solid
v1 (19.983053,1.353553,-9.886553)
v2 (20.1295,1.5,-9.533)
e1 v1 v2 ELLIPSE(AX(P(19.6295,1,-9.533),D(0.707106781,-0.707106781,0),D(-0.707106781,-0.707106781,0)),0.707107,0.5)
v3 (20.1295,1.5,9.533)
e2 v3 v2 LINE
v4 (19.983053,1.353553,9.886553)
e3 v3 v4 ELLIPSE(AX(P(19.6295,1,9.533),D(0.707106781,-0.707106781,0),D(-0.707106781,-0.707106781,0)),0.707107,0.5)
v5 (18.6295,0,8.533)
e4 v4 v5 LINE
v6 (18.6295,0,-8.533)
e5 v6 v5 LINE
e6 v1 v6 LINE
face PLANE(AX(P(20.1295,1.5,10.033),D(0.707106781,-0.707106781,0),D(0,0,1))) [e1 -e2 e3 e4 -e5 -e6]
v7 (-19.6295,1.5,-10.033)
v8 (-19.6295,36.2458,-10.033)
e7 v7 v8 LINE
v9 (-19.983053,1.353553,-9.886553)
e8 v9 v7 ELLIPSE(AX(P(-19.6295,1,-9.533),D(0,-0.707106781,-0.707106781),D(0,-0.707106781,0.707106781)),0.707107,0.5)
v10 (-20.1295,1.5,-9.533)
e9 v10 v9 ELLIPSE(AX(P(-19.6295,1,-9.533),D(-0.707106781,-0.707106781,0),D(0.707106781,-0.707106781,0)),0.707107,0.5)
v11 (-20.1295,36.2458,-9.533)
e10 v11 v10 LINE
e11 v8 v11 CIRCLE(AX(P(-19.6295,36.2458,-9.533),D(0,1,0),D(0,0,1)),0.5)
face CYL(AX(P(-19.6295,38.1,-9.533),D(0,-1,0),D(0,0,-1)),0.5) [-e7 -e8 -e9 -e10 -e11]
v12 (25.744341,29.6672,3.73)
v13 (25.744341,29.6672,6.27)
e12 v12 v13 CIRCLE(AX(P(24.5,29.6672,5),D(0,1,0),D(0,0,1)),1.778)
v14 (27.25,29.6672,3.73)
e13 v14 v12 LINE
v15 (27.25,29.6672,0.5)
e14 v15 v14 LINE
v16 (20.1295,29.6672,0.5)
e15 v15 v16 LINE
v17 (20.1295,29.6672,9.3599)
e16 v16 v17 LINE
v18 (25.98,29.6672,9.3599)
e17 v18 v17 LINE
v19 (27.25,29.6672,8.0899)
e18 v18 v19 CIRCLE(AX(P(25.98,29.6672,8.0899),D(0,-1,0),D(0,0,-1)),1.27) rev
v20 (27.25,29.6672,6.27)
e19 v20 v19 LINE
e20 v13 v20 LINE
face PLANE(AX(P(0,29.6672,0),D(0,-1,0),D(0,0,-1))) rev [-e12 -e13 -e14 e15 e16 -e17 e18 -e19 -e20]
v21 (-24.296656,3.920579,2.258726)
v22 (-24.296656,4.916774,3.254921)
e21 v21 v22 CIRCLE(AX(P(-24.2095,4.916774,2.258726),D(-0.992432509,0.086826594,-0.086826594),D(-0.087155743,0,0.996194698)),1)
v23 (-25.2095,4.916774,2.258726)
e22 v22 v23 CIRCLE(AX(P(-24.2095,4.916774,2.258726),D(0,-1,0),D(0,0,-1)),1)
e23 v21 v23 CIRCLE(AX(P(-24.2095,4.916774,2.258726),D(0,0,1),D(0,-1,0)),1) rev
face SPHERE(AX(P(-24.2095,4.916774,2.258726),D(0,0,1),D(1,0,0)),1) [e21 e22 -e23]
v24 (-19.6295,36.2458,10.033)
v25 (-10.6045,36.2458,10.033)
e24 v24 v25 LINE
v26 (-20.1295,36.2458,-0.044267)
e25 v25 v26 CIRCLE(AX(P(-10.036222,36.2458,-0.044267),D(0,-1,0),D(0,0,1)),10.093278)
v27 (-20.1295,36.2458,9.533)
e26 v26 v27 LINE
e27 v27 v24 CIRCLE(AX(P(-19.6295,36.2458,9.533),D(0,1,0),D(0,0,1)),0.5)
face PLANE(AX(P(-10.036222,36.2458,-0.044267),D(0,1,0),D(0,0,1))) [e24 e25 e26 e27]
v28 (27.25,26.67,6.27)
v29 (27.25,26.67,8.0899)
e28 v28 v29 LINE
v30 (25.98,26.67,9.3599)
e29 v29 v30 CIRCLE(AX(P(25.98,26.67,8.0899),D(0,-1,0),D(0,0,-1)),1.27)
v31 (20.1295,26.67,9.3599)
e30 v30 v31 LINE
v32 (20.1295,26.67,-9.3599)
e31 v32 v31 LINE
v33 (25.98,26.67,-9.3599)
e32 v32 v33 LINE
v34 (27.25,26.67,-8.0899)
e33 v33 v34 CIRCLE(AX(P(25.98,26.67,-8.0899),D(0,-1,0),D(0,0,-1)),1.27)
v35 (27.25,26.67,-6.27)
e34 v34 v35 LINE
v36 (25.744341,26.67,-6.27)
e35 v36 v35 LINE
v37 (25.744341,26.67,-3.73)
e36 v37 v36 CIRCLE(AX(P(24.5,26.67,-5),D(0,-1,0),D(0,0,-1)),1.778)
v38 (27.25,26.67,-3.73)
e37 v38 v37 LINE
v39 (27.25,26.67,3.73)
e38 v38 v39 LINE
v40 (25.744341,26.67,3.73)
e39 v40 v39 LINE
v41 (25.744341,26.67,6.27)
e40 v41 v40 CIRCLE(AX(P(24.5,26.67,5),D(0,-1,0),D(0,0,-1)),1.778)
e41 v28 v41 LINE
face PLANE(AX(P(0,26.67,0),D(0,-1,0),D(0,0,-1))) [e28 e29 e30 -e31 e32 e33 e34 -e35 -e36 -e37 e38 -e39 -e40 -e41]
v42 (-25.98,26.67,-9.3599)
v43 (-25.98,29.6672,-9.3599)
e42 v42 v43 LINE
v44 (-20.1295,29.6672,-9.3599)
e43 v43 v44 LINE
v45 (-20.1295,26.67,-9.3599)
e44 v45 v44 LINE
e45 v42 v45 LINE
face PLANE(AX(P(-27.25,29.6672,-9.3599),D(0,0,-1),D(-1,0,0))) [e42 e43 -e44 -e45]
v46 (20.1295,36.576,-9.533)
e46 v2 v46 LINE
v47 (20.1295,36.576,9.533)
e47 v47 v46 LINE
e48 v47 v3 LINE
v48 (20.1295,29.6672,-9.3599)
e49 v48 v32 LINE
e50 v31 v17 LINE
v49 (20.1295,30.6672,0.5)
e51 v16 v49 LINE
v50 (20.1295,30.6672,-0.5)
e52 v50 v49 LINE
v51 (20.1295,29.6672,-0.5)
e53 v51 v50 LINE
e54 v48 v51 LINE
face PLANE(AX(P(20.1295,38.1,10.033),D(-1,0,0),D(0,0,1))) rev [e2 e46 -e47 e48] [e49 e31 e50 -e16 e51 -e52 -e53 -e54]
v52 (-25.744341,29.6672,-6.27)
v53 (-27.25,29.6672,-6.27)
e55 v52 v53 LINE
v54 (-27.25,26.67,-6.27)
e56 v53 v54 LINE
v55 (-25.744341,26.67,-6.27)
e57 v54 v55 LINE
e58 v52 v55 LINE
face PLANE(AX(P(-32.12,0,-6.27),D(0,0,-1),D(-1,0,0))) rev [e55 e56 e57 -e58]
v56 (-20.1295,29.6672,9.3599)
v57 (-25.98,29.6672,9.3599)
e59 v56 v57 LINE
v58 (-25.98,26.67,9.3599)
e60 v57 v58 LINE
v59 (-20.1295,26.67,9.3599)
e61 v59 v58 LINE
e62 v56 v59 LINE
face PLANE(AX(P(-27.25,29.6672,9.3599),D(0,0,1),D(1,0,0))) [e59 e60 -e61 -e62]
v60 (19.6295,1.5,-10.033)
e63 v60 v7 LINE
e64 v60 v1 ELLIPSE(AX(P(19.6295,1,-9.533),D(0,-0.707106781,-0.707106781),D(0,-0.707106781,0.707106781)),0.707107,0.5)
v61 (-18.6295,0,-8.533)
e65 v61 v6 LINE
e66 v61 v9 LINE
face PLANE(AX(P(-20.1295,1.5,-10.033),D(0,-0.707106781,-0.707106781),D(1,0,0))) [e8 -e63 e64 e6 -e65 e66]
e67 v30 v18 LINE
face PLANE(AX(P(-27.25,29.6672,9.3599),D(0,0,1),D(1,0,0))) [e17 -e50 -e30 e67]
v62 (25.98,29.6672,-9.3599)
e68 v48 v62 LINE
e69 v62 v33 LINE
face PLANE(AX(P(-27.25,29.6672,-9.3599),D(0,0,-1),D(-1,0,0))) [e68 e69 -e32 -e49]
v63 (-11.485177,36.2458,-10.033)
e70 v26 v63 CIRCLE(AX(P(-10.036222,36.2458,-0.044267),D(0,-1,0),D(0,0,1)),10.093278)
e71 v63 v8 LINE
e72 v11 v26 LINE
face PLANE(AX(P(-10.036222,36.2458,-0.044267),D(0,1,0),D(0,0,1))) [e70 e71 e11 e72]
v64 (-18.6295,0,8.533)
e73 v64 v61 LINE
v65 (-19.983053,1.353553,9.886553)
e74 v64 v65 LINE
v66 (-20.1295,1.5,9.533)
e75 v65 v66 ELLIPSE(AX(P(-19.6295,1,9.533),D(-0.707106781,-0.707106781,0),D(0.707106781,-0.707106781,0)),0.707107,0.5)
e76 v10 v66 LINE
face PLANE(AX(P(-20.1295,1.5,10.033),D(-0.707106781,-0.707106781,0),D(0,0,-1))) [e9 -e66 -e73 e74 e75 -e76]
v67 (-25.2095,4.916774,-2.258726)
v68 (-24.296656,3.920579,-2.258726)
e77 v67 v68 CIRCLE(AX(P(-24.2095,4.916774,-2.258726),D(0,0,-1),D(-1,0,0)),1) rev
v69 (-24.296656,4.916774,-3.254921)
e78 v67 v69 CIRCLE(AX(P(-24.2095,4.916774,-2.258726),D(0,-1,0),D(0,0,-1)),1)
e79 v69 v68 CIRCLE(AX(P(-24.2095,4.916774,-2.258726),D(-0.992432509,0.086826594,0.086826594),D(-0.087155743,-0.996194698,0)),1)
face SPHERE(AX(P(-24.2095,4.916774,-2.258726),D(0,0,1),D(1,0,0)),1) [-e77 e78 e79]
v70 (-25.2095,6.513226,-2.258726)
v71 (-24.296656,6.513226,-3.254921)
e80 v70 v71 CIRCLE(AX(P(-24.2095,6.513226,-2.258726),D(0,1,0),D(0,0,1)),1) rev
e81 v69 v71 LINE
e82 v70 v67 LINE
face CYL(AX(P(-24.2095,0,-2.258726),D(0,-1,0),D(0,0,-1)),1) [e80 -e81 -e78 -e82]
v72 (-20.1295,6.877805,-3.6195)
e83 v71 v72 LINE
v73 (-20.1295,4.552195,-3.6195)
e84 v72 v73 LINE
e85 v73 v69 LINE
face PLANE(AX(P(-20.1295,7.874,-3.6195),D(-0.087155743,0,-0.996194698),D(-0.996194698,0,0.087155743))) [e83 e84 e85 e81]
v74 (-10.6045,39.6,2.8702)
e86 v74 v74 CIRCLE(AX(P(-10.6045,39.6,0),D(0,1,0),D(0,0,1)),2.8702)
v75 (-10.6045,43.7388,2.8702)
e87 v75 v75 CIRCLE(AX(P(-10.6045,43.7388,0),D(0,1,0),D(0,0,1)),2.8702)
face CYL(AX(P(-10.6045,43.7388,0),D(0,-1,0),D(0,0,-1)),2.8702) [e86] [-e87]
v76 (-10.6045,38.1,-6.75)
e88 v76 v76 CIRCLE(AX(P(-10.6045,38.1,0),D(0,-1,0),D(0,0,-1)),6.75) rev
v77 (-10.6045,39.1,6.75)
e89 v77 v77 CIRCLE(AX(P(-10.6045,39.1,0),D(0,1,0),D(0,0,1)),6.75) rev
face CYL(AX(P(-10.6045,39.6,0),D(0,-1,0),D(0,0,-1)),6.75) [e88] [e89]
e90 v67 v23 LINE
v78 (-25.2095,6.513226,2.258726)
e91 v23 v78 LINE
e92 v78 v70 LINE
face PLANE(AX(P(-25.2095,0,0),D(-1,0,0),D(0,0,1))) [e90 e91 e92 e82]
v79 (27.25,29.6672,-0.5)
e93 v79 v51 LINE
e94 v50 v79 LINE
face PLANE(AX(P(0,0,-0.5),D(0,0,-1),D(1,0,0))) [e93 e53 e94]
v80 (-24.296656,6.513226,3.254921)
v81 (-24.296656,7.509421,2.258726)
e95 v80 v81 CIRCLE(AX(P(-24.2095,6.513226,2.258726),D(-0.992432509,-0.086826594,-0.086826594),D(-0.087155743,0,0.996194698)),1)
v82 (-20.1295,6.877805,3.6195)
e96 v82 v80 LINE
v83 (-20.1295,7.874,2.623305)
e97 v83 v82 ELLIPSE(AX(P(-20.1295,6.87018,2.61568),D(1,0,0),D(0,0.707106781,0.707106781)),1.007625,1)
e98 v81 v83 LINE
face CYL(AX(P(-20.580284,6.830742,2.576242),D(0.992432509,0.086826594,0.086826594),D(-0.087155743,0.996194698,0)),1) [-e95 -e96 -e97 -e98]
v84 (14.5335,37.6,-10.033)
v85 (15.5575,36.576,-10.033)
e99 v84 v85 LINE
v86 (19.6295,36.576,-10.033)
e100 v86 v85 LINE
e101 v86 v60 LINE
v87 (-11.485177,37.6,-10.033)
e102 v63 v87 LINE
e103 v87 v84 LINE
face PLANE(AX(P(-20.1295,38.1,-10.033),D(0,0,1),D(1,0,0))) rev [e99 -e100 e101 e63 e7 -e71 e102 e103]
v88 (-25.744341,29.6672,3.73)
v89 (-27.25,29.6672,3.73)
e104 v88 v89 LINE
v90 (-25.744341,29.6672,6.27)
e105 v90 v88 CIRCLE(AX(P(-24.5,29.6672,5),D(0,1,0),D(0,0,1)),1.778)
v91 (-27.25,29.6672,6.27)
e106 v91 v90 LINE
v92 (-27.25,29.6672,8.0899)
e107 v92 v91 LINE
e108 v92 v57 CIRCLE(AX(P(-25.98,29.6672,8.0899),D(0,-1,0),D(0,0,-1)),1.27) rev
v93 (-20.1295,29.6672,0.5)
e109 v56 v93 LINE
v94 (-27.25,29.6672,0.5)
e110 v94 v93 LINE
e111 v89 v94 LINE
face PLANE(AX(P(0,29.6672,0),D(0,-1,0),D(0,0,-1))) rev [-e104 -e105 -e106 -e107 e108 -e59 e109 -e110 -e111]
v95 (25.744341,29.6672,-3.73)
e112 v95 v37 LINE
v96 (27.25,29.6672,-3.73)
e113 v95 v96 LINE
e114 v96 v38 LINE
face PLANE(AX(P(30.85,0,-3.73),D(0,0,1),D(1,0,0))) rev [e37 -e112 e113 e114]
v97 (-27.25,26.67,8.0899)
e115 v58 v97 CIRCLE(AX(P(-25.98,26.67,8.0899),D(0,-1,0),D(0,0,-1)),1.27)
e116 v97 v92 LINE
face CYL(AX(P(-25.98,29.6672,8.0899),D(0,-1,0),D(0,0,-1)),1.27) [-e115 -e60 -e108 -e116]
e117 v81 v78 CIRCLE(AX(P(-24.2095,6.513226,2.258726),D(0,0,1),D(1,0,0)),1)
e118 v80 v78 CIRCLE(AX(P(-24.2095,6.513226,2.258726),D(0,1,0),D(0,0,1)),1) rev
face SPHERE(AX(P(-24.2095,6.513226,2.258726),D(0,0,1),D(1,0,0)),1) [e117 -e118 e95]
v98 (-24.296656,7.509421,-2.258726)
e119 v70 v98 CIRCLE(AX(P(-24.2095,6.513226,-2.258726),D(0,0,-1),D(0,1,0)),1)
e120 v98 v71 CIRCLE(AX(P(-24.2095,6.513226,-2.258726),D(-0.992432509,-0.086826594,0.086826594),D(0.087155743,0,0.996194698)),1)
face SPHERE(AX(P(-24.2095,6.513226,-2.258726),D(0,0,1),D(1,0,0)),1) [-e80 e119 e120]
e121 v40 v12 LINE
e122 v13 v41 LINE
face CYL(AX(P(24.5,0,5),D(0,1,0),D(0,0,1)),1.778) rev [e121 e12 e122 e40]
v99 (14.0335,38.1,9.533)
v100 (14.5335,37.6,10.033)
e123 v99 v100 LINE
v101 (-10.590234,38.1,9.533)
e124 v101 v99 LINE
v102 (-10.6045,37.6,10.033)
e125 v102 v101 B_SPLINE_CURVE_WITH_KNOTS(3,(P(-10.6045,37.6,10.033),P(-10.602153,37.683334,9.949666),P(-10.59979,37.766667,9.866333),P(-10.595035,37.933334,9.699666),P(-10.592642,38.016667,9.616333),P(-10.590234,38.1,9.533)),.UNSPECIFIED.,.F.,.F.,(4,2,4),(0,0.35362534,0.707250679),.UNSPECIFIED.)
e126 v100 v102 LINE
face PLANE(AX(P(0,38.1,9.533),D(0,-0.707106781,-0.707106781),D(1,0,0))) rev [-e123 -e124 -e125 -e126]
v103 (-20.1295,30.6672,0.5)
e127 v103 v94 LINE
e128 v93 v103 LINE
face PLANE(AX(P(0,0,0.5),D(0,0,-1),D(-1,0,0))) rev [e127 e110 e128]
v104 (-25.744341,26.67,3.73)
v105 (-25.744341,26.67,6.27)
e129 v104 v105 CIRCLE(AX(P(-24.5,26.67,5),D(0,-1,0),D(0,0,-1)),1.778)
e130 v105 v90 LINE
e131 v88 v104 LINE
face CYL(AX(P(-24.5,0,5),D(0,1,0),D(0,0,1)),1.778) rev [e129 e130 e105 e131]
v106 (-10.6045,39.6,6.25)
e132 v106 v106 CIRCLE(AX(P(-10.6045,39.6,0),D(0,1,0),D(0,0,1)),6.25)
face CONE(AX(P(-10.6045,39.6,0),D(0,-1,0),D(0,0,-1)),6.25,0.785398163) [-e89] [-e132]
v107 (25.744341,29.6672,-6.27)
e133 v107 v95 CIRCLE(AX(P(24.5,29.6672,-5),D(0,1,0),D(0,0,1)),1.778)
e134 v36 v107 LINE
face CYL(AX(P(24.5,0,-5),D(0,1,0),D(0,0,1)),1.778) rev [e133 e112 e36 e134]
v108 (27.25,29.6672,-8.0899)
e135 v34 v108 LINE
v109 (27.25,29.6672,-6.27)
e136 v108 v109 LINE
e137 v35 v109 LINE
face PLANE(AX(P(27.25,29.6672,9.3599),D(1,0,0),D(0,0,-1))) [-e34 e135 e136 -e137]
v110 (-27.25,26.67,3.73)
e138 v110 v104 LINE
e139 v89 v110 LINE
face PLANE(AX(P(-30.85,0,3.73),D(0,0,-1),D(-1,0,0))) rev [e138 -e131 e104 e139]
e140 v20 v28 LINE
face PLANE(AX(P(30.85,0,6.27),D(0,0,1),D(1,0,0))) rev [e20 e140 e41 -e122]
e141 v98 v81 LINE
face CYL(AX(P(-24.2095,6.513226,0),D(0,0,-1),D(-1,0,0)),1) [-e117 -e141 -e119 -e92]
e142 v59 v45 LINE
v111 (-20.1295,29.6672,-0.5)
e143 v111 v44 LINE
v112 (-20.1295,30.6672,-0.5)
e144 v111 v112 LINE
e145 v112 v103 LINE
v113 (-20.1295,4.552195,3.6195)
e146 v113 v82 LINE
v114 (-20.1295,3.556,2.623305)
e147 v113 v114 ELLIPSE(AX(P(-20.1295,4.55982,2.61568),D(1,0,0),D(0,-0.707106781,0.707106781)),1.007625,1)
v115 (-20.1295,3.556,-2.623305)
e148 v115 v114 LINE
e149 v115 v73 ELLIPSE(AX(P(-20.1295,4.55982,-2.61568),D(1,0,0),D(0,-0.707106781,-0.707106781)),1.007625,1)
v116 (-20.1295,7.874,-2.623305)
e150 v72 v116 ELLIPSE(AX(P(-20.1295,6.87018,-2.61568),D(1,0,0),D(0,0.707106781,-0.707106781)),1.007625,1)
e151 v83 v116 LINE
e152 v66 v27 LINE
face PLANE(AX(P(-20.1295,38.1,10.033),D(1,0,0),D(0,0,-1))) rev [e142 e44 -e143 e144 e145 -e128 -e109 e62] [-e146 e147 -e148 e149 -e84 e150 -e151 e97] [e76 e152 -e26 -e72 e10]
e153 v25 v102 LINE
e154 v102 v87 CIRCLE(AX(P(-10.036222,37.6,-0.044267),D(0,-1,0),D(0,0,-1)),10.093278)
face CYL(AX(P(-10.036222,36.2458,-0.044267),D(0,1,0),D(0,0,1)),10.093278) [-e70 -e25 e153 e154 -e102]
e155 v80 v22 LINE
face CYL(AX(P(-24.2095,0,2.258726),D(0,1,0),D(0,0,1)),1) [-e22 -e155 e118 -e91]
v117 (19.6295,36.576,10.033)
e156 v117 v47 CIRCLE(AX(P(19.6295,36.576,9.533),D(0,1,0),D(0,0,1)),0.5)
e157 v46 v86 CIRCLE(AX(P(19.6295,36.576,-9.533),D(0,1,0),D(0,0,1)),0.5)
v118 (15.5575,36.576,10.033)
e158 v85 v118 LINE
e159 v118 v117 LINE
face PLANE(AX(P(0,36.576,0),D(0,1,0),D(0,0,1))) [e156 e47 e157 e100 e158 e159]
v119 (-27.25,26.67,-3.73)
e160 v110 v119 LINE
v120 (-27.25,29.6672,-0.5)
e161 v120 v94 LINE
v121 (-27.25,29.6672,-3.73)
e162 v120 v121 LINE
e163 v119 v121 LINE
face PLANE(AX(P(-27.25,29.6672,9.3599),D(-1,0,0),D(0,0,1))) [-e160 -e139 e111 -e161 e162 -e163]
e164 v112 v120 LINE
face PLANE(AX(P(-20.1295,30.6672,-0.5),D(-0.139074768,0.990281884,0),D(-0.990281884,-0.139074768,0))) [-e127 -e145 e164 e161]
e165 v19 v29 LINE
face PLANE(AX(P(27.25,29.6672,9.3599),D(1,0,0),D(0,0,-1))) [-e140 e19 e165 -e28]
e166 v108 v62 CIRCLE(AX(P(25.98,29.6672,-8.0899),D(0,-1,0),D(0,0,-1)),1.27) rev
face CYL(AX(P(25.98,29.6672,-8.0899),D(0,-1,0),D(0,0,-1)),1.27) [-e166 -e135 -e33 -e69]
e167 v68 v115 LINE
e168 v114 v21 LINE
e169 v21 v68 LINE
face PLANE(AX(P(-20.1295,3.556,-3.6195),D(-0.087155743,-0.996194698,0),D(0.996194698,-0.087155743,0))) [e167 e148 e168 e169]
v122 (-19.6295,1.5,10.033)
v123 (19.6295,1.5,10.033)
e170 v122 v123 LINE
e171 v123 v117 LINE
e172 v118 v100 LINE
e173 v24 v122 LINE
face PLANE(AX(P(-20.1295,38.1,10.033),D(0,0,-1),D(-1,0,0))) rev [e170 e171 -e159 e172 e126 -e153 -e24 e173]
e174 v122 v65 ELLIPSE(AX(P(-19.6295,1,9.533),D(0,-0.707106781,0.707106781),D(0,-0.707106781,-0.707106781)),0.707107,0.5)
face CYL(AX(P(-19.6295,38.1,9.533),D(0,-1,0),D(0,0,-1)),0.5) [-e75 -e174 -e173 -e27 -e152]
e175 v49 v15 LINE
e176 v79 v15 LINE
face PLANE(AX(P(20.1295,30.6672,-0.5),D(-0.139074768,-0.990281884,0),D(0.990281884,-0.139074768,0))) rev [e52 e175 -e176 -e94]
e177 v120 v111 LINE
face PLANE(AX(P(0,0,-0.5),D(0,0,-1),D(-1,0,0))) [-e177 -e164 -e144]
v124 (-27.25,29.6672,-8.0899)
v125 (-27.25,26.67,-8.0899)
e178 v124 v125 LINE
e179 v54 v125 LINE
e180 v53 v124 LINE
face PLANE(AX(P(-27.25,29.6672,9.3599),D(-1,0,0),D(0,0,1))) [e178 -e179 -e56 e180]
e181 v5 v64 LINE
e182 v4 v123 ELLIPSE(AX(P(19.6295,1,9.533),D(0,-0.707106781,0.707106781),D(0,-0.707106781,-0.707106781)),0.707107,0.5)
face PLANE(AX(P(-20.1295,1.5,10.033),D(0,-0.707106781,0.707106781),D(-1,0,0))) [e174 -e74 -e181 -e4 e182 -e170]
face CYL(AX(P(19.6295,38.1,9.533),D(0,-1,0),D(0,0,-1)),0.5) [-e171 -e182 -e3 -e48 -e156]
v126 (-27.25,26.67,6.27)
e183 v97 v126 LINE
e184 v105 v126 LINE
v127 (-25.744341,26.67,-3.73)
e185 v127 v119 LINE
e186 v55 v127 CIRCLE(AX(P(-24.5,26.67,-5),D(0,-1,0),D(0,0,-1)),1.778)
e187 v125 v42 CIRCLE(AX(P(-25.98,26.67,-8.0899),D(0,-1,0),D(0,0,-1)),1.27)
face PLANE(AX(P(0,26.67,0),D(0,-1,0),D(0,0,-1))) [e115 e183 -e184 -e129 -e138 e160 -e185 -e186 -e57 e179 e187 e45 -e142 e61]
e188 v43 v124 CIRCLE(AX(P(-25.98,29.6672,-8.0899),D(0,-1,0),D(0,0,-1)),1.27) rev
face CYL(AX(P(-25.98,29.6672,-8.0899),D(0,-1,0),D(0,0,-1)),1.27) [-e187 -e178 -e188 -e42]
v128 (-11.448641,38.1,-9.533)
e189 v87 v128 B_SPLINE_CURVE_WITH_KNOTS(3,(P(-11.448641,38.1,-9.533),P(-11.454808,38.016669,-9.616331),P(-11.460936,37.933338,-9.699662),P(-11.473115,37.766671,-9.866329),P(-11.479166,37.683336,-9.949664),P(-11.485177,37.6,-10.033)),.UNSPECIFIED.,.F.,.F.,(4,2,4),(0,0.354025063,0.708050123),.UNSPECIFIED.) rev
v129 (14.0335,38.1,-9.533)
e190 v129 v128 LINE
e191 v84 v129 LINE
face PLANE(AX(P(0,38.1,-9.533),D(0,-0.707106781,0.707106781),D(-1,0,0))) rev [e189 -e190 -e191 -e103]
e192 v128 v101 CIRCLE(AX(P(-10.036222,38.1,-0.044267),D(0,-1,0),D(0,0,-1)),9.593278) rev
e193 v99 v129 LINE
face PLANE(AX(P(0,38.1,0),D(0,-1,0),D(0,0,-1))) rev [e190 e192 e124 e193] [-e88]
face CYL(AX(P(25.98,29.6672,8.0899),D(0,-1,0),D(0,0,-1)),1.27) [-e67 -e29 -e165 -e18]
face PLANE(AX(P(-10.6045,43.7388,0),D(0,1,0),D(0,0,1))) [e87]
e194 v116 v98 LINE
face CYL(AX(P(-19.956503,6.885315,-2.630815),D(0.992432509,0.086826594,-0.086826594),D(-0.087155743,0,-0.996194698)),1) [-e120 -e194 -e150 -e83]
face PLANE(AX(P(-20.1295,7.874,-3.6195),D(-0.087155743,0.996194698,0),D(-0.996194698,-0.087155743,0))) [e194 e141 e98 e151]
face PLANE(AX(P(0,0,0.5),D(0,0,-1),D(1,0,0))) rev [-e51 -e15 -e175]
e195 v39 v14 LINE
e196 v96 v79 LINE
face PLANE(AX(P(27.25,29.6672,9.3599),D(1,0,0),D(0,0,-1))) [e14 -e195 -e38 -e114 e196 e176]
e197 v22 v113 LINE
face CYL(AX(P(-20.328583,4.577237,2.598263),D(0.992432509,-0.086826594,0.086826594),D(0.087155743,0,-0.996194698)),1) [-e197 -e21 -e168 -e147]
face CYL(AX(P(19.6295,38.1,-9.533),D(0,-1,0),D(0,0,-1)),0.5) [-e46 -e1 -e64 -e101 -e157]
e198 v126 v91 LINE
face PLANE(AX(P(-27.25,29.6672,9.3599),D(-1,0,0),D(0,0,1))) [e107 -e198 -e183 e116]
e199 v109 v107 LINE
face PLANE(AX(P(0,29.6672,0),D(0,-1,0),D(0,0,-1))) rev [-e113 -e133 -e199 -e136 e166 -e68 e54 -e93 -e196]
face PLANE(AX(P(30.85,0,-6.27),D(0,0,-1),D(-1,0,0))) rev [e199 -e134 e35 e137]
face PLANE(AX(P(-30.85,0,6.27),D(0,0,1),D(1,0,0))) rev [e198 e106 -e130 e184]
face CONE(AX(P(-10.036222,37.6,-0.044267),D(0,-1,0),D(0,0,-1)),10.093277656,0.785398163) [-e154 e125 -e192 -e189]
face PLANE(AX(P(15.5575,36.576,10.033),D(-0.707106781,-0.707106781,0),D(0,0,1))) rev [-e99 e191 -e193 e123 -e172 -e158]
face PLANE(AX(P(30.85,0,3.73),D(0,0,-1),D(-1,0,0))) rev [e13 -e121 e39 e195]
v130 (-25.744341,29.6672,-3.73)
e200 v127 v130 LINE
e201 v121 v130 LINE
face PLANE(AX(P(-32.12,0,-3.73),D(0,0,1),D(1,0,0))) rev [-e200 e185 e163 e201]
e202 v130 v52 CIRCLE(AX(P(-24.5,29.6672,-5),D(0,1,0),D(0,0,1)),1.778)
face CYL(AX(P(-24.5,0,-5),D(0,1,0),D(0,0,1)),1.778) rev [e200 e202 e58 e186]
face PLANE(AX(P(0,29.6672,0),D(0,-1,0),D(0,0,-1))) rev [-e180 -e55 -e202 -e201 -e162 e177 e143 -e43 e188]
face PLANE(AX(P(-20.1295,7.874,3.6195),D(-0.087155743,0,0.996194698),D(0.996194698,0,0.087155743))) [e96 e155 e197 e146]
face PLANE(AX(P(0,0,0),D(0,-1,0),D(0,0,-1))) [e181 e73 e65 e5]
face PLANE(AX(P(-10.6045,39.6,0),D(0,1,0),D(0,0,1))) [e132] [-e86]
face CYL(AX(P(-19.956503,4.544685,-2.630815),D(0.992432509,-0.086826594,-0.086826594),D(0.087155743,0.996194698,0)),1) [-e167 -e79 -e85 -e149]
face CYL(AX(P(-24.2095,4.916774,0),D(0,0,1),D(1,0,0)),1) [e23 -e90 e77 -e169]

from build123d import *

# Parameters (mm, degrees)
SKETCH1_W           = 40.259
SKETCH1_H           = 20.066
BOSS_EXTRUDE1_DEPTH = 38.1
SKETCH2_W           = 54.5
SKETCH2_H           = 18.7198
BOSS_EXTRUDE2_DEPTH = 2.9972
SKETCH3_R           = 2.8702
BOSS_EXTRUDE3_DEPTH = 5.6388
SKETCH4_R           = 1.778
CUT_EXTRUDE1_DEPTH  = 42.513447759
SKETCH5_W           = 7.62
SKETCH5_H           = 2.54
SKETCH5_W_2         = 6.35
CUT_EXTRUDE2_DEPTH  = 42.513447759
FILLET2_R           = 1.27
SKETCH6_W           = 7.239
SKETCH6_H           = 4.318
BOSS_EXTRUDE4_DEPTH = 5.08
BOSS_EXTRUDE4_TAPER = 5
SKETCH7_W           = 4.572
SKETCH7_H           = 20.066
CUT_EXTRUDE3_DEPTH  = 1.524
CHAMFER1_SIZE       = 1.524
CUT_EXTRUDE4_DEPTH  = 1.8542
SKETCH9_R           = 6.75
BOSS_EXTRUDE5_DEPTH = 1.5
CHAMFER2_SIZE       = 0.5
CHAMFER3_SIZE       = 1.5
FILLET3_R           = 0.5
BOSS_EXTRUDE6_DEPTH = 0.5
FILLET4_R           = 1


with BuildPart() as part:
    # Sketch1 → Boss-Extrude1 (new body)
    with BuildSketch(Plane(origin=(0, 0, 0), x_dir=(1, 0, 0), z_dir=(0, 1, 0))):
        Rectangle(SKETCH1_W, SKETCH1_H)
    extrude(amount=BOSS_EXTRUDE1_DEPTH)

    # Sketch2 → Boss-Extrude2 (add)
    with BuildSketch(Plane(origin=(0, 26.67, 0), x_dir=(-1, 0, 0), z_dir=(0, -1, 0))):
        Rectangle(SKETCH2_W, SKETCH2_H)
    extrude(amount=-BOSS_EXTRUDE2_DEPTH)

    # Sketch3 → Boss-Extrude3 (add)
    with BuildSketch(Plane(origin=(0, 38.1, 0), x_dir=(1, 0, 0), z_dir=(0, 1, 0))):
        with Locations(Location((-10.6045, 0, 0), (0, 0, 90))):
            Circle(SKETCH3_R)
    extrude(amount=BOSS_EXTRUDE3_DEPTH)

    # Sketch4 → Cut-Extrude1 (cut, through all)
    with BuildSketch(Plane(origin=(0, 29.6672, 0), x_dir=(1, 0, 0), z_dir=(0, 1, 0))):
        with Locations(Location((-24.5, 5, 0), (0, 0, 270))):
            Circle(SKETCH4_R)
        with Locations(Location((-24.5, -5, 0), (0, 0, 270))):
            Circle(SKETCH4_R)
        with Locations(Location((24.5, -5, 0), (0, 0, 270))):
            Circle(SKETCH4_R)
        with Locations(Location((24.5, 5, 0), (0, 0, 270))):
            Circle(SKETCH4_R)
    extrude(amount=-CUT_EXTRUDE1_DEPTH, mode=Mode.SUBTRACT)

    # Sketch5 → Cut-Extrude2 (cut, through all)
    with BuildSketch(Plane(origin=(0, 29.6672, 0), x_dir=(1, 0, 0), z_dir=(0, 1, 0))):
        with Locations((-28.31, 5)):
            Rectangle(SKETCH5_W, SKETCH5_H)
        with Locations((-27.675, -5)):
            Rectangle(SKETCH5_W_2, SKETCH5_H)
        with Locations((27.675, 5)):
            Rectangle(SKETCH5_W_2, SKETCH5_H)
        with Locations((27.675, -5)):
            Rectangle(SKETCH5_W_2, SKETCH5_H)
    extrude(amount=-CUT_EXTRUDE2_DEPTH, mode=Mode.SUBTRACT)

    # Fillet2
    fillet2_edges = [part.edges().sort_by_distance(p)[0] for p in [
        (27.25, 28.1686, -9.3599),
        (-27.25, 28.1686, 9.3599),
        (27.25, 28.1686, 9.3599),
        (-27.25, 28.1686, -9.3599),
    ]]
    fillet(fillet2_edges, radius=FILLET2_R)

    # Sketch6 → Boss-Extrude4 (add)
    with BuildSketch(Plane.ZY.offset(20.1295)):
        with Locations((0, 5.715)):
            Rectangle(SKETCH6_W, SKETCH6_H)
    extrude(amount=BOSS_EXTRUDE4_DEPTH, taper=BOSS_EXTRUDE4_TAPER)

    # Sketch7 → Cut-Extrude3 (cut)
    with BuildSketch(Plane(origin=(0, 38.1, 0), x_dir=(1, 0, 0), z_dir=(0, 1, 0))):
        with Locations((17.8435, 0)):
            Rectangle(SKETCH7_W, SKETCH7_H)
    extrude(amount=-CUT_EXTRUDE3_DEPTH, mode=Mode.SUBTRACT)

    # Chamfer1
    chamfer1_edges = [part.edges().sort_by_distance(p)[0] for p in [
        (15.5575, 38.1, 0),
    ]]
    chamfer(chamfer1_edges, length=CHAMFER1_SIZE - 0.0001)  # a hair under: the kernel refuses the full size

    # Sketch8 → Cut-Extrude4 (cut)
    with BuildSketch(Plane(origin=(0, 38.1, 0), x_dir=(1, 0, 0), z_dir=(0, 1, 0))):
        with BuildLine():
            Line((-10.6045, 10.121534413), (-31.431367674, 17.812165279))
            Line((-31.431367674, 17.812165279), (-23.526690426, -15.868179363))
            Line((-23.526690426, -15.868179363), (-10.6045, -10.033))
            ThreePointArc((-10.6045, -10.033), (-20.1295, 0.044267206), (-10.6045, 10.121534413))
        make_face()
    extrude(amount=-CUT_EXTRUDE4_DEPTH, mode=Mode.SUBTRACT)

    # Sketch9 → Boss-Extrude5 (add)
    with BuildSketch(Plane(origin=(0, 38.1, 0), x_dir=(1, 0, 0), z_dir=(0, 1, 0))):
        with Locations(Location((-10.6045, 0, 0), (0, 0, 90))):
            Circle(SKETCH9_R)
    extrude(amount=BOSS_EXTRUDE5_DEPTH)

    # Chamfer2
    chamfer2_edges = [part.edges().sort_by_distance(p)[0] for p in [
        (1.274211255, 38.1, -10.033),
    ]]
    chamfer(chamfer2_edges, length=CHAMFER2_SIZE)
    chamfer2_2_edges = [part.edges().sort_by_distance(p)[0] for p in [
        (-20.022463004, 38.1, 1.421765307),
    ]]
    chamfer(chamfer2_2_edges, length=CHAMFER2_SIZE)
    chamfer2_3_edges = [part.edges().sort_by_distance(p)[0] for p in [
        (-10.6045, 39.6, 6.75),
    ]]
    chamfer(chamfer2_3_edges, length=CHAMFER2_SIZE)

    # Chamfer3
    chamfer3_edges = [part.edges().sort_by_distance(p)[0] for p in [
        (0, 0, 10.033),
        (-20.1295, 0, 0),
        (0, 0, -10.033),
        (20.1295, 0, 0),
    ]]
    chamfer(chamfer3_edges, length=CHAMFER3_SIZE)

    # Fillet3
    fillet3_edges = [part.edges().sort_by_distance(p)[0] for p in [
        (20.1295, 19.038, 10.033),
        (20.1295, 19.038, -10.033),
        (-20.1295, 18.8729, 10.033),
        (-20.1295, 18.8729, -10.033),
    ]]
    fillet(fillet3_edges, radius=FILLET3_R)

    # Sketch12 → Boss-Extrude6 (add, symmetric)
    with BuildSketch(Plane.XY):
        Polygon((-27.25, 29.6672), (-20.1295, 29.6672), (-20.1295, 30.6672), align=None)
    boss_extrude6 = extrude(amount=BOSS_EXTRUDE6_DEPTH, both=True)

    # Mirror1: Boss-Extrude6 across plane
    add(boss_extrude6.mirror(Plane(origin=(0, 0, 0), x_dir=(0, 0, 1), z_dir=(1, 0, 0))))

    # Fillet4
    fillet4_edges = [part.edges().sort_by_distance(p)[0] for p in [
        (-22.6695, 3.778221205, 3.397278795),
        (-22.6695, 7.651778795, 3.397278795),
        (-22.6695, 7.651778795, -3.397278795),
        (-22.6695, 3.778221205, -3.397278795),
        (-25.2095, 5.715, 3.175057589),
        (-25.2095, 7.429557589, 0),
        (-25.2095, 5.715, -3.175057589),
        (-25.2095, 4.000442411, 0),
    ]]
    fillet(fillet4_edges, radius=FILLET4_R)


solid = part.part
